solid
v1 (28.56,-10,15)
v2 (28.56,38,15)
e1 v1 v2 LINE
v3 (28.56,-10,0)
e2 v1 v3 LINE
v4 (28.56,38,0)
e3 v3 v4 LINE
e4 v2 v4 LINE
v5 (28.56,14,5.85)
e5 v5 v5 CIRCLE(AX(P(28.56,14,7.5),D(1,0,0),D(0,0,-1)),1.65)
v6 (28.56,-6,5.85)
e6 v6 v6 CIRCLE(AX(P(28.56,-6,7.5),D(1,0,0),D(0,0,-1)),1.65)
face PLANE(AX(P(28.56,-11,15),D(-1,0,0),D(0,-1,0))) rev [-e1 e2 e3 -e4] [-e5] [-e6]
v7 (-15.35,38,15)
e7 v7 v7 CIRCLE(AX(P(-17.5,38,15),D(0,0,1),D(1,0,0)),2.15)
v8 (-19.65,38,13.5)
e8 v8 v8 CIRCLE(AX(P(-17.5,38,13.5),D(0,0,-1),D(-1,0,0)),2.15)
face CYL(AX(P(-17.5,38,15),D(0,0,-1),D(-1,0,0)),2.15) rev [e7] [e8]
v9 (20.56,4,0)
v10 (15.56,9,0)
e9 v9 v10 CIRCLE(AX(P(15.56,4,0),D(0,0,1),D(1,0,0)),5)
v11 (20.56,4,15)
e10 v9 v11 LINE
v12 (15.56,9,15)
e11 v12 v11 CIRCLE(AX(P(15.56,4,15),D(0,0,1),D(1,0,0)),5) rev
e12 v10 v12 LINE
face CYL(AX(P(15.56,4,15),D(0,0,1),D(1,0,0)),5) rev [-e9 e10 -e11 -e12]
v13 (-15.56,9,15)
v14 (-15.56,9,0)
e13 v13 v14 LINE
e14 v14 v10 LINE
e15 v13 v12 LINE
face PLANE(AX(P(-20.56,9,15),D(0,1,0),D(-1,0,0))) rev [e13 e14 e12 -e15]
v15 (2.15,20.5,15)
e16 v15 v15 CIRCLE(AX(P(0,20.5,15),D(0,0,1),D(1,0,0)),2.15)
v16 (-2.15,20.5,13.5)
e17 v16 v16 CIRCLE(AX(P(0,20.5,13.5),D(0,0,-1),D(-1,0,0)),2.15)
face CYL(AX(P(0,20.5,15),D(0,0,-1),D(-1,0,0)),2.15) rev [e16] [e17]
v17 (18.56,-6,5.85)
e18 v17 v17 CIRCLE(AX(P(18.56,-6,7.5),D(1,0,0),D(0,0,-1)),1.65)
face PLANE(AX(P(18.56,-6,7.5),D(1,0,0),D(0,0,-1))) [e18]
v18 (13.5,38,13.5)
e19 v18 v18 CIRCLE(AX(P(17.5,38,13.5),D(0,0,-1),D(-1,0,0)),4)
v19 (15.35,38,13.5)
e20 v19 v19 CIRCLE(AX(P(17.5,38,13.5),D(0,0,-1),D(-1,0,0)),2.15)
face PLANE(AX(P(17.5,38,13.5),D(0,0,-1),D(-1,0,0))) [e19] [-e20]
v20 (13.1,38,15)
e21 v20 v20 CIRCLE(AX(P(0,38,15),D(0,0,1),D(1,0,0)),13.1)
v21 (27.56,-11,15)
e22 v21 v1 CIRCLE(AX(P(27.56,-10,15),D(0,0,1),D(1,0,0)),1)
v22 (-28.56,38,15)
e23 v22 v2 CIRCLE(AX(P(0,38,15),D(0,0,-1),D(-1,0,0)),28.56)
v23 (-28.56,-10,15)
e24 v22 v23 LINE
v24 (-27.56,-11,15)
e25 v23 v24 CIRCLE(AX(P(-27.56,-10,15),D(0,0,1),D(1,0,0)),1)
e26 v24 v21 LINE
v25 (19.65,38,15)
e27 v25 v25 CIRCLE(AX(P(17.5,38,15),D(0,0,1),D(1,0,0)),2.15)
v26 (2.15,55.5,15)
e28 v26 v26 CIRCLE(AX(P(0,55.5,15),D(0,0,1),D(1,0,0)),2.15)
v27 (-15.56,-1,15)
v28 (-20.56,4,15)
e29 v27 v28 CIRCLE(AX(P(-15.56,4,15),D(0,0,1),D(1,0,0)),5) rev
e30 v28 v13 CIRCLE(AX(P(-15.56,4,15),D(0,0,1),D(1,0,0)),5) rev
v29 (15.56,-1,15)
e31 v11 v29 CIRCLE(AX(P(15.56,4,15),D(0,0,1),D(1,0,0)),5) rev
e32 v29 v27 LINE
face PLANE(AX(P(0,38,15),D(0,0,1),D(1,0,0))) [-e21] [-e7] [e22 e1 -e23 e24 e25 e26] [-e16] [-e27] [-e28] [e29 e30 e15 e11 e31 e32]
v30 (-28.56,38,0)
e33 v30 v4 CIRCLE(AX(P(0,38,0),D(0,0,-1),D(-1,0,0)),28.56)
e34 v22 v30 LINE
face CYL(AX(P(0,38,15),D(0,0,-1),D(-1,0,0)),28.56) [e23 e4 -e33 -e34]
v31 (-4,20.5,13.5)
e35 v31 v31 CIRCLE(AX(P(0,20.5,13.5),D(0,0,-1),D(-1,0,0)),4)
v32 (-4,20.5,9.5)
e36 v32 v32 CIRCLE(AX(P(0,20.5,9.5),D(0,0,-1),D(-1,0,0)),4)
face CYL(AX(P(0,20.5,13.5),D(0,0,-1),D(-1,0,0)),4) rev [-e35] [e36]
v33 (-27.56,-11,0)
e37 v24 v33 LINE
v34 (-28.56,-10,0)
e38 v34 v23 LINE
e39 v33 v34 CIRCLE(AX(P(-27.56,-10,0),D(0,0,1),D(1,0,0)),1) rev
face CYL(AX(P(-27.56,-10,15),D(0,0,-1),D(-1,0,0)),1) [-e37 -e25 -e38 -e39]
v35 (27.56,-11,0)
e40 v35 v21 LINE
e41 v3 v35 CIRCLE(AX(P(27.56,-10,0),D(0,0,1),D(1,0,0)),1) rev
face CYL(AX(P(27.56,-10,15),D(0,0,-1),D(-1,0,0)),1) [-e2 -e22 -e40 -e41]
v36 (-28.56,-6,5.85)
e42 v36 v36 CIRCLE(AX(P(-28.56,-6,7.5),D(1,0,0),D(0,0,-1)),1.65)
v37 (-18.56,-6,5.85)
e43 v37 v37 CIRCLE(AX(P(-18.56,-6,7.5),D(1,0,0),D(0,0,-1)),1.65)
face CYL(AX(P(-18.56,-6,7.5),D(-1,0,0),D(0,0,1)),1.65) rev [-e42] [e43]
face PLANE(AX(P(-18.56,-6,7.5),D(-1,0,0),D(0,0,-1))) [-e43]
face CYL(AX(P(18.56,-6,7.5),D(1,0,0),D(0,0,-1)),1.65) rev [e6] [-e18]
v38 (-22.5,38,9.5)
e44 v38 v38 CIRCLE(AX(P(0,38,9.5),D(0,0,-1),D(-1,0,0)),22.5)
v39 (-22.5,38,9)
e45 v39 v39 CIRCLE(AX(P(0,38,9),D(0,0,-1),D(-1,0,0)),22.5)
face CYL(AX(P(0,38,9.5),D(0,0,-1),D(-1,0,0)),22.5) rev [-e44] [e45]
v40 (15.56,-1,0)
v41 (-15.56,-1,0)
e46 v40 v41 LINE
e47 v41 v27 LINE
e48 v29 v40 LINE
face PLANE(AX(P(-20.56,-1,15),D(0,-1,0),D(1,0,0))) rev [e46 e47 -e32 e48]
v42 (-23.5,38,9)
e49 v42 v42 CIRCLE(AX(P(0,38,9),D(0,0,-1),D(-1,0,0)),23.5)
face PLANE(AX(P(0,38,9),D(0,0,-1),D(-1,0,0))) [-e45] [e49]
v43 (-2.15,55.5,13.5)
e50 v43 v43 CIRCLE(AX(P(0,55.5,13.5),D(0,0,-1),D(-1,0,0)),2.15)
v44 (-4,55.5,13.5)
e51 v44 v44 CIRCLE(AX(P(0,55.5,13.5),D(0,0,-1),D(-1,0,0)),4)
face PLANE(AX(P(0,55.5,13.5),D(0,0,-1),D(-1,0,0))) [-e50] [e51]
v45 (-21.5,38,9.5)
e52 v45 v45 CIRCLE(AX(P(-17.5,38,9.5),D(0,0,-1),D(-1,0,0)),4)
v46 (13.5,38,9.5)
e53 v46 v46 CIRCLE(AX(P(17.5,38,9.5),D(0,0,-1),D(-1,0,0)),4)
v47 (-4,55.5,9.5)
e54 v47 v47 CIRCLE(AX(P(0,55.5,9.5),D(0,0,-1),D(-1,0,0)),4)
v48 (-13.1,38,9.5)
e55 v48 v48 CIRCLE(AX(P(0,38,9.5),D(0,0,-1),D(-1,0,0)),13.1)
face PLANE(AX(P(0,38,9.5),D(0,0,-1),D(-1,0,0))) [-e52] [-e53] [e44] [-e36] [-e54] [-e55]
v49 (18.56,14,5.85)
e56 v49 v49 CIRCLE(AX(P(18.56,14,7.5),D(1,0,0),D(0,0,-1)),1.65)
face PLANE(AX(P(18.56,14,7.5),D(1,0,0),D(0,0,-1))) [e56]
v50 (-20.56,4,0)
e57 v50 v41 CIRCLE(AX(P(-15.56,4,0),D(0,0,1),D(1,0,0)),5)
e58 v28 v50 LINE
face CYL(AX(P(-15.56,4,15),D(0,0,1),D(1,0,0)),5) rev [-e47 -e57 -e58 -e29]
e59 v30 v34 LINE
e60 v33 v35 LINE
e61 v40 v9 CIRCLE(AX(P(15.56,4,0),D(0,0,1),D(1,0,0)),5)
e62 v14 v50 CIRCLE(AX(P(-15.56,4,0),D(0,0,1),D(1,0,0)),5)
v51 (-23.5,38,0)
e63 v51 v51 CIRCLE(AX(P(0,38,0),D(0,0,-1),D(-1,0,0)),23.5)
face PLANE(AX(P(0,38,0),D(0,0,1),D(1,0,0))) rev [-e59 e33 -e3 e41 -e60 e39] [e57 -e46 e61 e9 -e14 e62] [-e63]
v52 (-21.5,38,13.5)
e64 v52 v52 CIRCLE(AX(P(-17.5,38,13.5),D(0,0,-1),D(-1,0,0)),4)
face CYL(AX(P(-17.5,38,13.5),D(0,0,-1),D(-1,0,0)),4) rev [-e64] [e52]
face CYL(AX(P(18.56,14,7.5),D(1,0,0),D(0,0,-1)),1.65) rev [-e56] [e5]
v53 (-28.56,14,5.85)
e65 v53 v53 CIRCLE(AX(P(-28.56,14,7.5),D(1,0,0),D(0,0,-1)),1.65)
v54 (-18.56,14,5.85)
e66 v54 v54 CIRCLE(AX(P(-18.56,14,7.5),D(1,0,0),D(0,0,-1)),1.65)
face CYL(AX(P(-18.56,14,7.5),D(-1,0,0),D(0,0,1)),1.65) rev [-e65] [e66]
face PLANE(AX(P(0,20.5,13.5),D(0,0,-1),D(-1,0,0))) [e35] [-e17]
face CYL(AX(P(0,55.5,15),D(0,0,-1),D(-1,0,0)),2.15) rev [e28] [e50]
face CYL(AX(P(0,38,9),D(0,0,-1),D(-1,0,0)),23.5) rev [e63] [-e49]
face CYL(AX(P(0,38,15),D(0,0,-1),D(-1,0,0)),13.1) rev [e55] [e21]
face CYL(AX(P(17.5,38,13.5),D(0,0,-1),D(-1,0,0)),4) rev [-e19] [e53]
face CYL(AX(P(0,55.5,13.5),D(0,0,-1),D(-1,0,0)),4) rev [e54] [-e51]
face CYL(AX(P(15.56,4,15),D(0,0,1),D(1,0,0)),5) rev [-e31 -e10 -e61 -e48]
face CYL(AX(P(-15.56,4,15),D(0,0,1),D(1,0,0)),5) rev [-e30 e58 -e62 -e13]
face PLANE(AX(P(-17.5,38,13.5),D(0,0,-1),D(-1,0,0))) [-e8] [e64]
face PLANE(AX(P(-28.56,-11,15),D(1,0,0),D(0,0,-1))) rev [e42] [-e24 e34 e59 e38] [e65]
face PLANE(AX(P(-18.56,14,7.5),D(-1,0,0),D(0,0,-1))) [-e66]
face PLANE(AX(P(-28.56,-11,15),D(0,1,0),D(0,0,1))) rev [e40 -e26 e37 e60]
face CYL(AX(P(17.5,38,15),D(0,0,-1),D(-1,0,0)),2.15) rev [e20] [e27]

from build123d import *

# Parameters (mm, degrees)
SKETCH_1_R           = 13.1
SKETCH_1_R_2         = 2.15
EXTRUDE_1_DEPTH      = 15
SKETCH_2_R           = 1.65
CUT_EXTRUDE_2_DEPTH  = 10
FILLET_3_R           = 1
SKETCH_7_R           = 23.5
CUT_EXTRUDE_7_DEPTH  = 9
SKETCH_9_R           = 22.5
CUT_EXTRUDE_9_DEPTH  = 0.5
SKETCH_10_R          = 4
CUT_EXTRUDE_10_DEPTH = 4
CUT_EXTRUDE_11_DEPTH = 80.771072474
SKETCH_12_W          = 41.12
SKETCH_12_H          = 10
CUT_EXTRUDE_12_DEPTH = 74.965581185
FILLET_4_R           = 5


with BuildPart() as part:
    # ｽｹｯﾁ1 → ﾎﾞｽ - 押し出し1 (new body)
    with BuildSketch(Plane.XY):
        with BuildLine():
            Line((-28.56, -11), (28.56, -11))
            Line((28.56, -11), (28.56, 21.386752274))
            ThreePointArc((28.56, 21.386752274), (0, 71.040484258), (-28.56, 21.386752274))
            Line((-28.56, 21.386752274), (-28.56, -11))
        make_face()
        with Locations((0, 38)):
            Circle(SKETCH_1_R, mode=Mode.SUBTRACT)
        with Locations((0, 55.5)):
            Circle(SKETCH_1_R_2, mode=Mode.SUBTRACT)
        with Locations((17.5, 38)):
            Circle(SKETCH_1_R_2, mode=Mode.SUBTRACT)
        with Locations((0, 20.5)):
            Circle(SKETCH_1_R_2, mode=Mode.SUBTRACT)
        with Locations((-17.5, 38)):
            Circle(SKETCH_1_R_2, mode=Mode.SUBTRACT)
    extrude(amount=EXTRUDE_1_DEPTH)

    # ｽｹｯﾁ2 → ｶｯﾄ - 押し出し2 (cut)
    with BuildSketch(Plane(origin=(28.56, 0, 0), x_dir=(0, 0, -1), z_dir=(1, 0, 0))):
        with Locations((-7.5, -6)):
            Circle(SKETCH_2_R)
        with Locations((-7.5, 14)):
            Circle(SKETCH_2_R)
    cut_extrude_2 = extrude(amount=-CUT_EXTRUDE_2_DEPTH, mode=Mode.SUBTRACT)

    # ﾐﾗｰ2: ｶｯﾄ - 押し出し2 across plane
    add(cut_extrude_2.mirror(Plane.ZY), mode=Mode.SUBTRACT)

    # ﾌｨﾚｯﾄ3
    fillet_3_edges = [part.edges().sort_by_distance(p)[0] for p in [
        (28.56, -11, 7.5),
        (-28.56, -11, 7.5),
    ]]
    fillet(fillet_3_edges, radius=FILLET_3_R)

    # ｽｹｯﾁ7 → ｶｯﾄ - 押し出し7 (cut)
    with BuildSketch(Plane(origin=(0, 0, 0), x_dir=(-1, 0, 0), z_dir=(0, 0, -1))):
        with Locations((0, 38)):
            Circle(SKETCH_7_R)
    extrude(amount=-CUT_EXTRUDE_7_DEPTH, mode=Mode.SUBTRACT)

    # ｽｹｯﾁ9 → ｶｯﾄ - 押し出し9 (cut)
    with BuildSketch(Plane(origin=(0, 0, 9), x_dir=(-1, 0, 0), z_dir=(0, 0, -1))):
        with Locations((0, 38)):
            Circle(SKETCH_9_R)
    extrude(amount=-CUT_EXTRUDE_9_DEPTH, mode=Mode.SUBTRACT)

    # ｽｹｯﾁ10 → ｶｯﾄ - 押し出し10 (cut)
    with BuildSketch(Plane(origin=(0, 0, 9.5), x_dir=(-1, 0, 0), z_dir=(0, 0, -1))):
        with Locations((0, 55.5)):
            Circle(SKETCH_10_R)
        with Locations((17.5, 38)):
            Circle(SKETCH_10_R)
        with Locations((-17.5, 38)):
            Circle(SKETCH_10_R)
        with Locations((0, 20.5)):
            Circle(SKETCH_10_R)
    extrude(amount=-CUT_EXTRUDE_10_DEPTH, mode=Mode.SUBTRACT)

    # ｽｹｯﾁ11 → ｶｯﾄ - 押し出し11 (cut, through all)
    with BuildSketch(Plane(origin=(0, 0, 0), x_dir=(-1, 0, 0), z_dir=(0, 0, -1))):
        with BuildLine():
            Line((-28.56, 21.386752274), (-28.56, 38))
            ThreePointArc((-28.56, 38), (0, 66.56), (28.56, 38))
            Line((28.56, 38), (28.56, 21.386752274))
            ThreePointArc((28.56, 21.386752274), (31.900703992, 29.39658877), (33.040484258, 38))
            ThreePointArc((33.040484258, 38), (-8.60341123, 69.900703992), (-28.56, 21.386752274))
        make_face()
    extrude(amount=-CUT_EXTRUDE_11_DEPTH, mode=Mode.SUBTRACT)

    # ｽｹｯﾁ12 → ｶｯﾄ - 押し出し12 (cut, through all)
    with BuildSketch(Plane(origin=(0, 0, 0), x_dir=(-1, 0, 0), z_dir=(0, 0, -1))):
        with Locations((0, 4)):
            Rectangle(SKETCH_12_W, SKETCH_12_H)
    extrude(amount=-CUT_EXTRUDE_12_DEPTH, mode=Mode.SUBTRACT)

    # ﾌｨﾚｯﾄ4
    fillet_4_edges = [part.edges().sort_by_distance(p)[0] for p in [
        (-20.56, 9, 7.5),
        (-20.56, -1, 7.5),
        (20.56, 9, 7.5),
        (20.56, -1, 7.5),
    ]]
    fillet(fillet_4_edges, radius=FILLET_4_R - 0.0001)  # a hair under: the kernel refuses the full size


solid = part.part
